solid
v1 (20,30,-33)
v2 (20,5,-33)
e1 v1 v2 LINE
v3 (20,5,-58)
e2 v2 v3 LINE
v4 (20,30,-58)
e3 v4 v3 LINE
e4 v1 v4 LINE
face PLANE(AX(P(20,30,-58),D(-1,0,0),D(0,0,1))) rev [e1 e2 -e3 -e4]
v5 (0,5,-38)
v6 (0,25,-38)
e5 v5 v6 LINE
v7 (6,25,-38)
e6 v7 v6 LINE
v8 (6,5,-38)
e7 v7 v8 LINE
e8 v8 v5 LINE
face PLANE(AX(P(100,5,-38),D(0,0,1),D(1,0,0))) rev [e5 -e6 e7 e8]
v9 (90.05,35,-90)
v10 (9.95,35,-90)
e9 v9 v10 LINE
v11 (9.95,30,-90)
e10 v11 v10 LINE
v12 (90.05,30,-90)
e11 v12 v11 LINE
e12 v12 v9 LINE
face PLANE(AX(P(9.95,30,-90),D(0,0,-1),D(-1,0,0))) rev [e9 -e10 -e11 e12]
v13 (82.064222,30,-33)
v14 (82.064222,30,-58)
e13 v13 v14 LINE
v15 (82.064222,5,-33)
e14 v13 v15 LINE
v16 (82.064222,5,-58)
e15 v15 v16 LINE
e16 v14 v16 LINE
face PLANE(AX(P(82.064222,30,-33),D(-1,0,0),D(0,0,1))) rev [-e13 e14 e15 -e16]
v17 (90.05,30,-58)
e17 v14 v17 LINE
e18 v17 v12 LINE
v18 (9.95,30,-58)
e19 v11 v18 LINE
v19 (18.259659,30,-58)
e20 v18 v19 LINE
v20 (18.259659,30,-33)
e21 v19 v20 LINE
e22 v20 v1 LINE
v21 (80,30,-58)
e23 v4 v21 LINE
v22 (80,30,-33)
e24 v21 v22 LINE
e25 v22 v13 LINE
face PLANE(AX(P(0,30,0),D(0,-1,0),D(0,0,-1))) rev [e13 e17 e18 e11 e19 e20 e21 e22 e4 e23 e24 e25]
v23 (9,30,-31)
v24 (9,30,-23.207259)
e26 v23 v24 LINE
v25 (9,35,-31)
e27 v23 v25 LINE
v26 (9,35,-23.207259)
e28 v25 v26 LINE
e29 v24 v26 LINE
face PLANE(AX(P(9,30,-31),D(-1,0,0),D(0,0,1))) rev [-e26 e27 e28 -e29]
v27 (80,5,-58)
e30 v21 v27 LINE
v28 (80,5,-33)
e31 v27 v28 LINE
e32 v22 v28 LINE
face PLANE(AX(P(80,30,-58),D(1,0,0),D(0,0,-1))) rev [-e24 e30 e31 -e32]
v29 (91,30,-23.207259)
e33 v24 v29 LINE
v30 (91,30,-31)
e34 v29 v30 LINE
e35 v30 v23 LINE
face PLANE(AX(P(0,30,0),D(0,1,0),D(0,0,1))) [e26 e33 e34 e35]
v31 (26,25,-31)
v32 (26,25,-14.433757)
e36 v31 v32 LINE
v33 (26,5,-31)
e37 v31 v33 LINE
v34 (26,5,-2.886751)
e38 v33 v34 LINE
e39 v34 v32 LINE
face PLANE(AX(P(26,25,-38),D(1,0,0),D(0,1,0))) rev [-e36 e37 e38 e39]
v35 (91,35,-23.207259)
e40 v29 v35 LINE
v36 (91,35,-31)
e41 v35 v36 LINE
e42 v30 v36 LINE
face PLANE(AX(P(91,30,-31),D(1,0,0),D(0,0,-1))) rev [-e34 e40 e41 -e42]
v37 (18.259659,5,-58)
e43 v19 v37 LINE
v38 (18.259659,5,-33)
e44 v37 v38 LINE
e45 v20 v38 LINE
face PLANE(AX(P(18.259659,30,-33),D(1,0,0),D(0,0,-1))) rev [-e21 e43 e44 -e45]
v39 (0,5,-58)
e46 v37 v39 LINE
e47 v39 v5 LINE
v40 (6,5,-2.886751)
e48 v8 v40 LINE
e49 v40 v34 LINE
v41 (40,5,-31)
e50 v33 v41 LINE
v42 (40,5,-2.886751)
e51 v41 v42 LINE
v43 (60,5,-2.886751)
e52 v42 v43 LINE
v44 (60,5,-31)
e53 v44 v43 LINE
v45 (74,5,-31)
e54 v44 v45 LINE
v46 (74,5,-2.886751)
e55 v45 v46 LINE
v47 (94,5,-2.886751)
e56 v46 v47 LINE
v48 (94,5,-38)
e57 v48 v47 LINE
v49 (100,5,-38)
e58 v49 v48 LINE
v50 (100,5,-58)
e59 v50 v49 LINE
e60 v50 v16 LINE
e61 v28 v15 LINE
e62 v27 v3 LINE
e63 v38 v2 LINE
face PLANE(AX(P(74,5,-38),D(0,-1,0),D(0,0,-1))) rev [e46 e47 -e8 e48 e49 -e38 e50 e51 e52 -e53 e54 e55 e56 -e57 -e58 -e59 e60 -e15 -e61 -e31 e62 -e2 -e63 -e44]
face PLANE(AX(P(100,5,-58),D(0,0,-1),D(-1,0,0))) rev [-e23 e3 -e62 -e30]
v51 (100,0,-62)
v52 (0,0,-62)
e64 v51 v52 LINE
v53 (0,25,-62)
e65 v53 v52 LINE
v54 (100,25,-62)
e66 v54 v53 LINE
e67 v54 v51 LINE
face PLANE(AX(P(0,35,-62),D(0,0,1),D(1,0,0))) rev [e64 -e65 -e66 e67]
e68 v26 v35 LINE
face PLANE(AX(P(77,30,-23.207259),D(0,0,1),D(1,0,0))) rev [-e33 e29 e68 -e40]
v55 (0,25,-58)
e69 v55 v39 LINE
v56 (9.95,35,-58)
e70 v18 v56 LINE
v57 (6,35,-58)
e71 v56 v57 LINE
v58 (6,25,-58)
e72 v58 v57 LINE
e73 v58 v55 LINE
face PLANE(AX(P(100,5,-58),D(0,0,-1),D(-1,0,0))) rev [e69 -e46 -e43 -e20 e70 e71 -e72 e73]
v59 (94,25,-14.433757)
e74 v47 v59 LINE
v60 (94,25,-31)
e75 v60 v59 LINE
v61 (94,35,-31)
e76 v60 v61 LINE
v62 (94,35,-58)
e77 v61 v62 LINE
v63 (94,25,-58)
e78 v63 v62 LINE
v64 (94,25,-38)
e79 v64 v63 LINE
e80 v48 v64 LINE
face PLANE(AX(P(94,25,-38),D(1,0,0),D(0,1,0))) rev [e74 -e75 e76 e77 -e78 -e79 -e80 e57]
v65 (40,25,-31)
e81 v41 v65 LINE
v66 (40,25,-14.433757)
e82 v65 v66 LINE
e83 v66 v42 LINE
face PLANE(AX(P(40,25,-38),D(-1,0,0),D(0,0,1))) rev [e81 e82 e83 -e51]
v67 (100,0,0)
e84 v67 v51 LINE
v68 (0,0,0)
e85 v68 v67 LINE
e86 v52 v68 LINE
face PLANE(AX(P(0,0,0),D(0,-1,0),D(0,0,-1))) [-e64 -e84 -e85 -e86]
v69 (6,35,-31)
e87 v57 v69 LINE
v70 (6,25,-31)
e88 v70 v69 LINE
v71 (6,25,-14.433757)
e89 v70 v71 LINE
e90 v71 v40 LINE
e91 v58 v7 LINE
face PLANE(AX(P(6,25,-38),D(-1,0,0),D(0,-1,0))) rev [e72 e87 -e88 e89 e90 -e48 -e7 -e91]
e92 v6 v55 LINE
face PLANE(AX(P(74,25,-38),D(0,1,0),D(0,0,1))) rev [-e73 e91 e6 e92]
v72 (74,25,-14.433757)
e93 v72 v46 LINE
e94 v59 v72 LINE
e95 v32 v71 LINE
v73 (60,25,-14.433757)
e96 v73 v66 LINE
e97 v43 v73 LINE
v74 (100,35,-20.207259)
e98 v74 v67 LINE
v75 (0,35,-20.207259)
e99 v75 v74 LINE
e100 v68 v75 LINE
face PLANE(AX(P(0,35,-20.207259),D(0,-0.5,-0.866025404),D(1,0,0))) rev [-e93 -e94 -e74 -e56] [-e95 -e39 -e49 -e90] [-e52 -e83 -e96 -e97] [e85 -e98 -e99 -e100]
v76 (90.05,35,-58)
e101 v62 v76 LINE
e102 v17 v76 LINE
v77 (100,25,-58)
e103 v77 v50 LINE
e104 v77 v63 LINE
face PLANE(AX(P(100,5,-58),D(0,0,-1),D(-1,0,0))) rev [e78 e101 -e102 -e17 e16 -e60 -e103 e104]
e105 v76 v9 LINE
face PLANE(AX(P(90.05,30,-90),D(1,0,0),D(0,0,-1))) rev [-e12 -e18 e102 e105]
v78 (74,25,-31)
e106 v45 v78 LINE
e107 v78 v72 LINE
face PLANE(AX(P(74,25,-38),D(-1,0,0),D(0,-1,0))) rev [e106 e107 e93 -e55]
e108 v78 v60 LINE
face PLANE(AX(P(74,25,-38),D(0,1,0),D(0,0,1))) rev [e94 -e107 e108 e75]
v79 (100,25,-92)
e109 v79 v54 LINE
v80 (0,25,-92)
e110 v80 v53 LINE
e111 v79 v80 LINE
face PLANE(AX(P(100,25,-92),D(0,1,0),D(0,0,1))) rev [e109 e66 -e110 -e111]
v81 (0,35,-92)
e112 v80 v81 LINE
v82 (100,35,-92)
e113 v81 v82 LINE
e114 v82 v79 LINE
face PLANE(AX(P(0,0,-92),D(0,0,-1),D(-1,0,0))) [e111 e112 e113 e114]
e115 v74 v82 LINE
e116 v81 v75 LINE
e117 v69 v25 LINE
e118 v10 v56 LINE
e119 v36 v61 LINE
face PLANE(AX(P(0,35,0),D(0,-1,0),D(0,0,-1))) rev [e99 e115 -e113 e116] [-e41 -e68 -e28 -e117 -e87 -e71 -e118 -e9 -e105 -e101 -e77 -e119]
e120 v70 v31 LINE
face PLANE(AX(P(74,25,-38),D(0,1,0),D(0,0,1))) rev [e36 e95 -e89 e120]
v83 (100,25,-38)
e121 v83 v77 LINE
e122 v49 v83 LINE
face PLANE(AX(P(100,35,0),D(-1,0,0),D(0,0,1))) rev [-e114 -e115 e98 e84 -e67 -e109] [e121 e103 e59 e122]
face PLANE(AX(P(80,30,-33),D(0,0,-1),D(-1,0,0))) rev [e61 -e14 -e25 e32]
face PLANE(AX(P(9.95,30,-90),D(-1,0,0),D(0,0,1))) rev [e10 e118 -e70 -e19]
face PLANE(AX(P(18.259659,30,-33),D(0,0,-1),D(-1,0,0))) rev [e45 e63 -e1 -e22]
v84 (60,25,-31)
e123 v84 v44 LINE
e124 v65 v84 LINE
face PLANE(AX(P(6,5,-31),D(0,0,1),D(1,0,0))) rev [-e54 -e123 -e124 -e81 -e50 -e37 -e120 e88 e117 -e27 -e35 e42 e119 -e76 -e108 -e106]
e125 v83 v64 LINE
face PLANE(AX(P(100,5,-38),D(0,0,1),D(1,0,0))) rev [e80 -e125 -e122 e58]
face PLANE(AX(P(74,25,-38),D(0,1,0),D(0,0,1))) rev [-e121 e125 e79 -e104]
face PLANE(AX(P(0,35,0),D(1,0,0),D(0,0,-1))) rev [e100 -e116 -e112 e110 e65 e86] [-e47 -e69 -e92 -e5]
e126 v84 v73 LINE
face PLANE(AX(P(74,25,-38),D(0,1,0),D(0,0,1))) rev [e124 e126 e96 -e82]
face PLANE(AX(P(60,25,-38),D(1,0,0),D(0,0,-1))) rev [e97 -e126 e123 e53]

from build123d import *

# Parameters (mm, degrees)
CROQUIS1_W              = 100
CROQUIS1_H              = 62
SALIENTE_EXTRUIR1_DEPTH = 35
CHAFL_N1_SIZE2          = 20.207259422
CHAFL_N1_SIZE           = 35
CROQUIS3_W              = 20
CROQUIS3_H              = 20
CORTAR_EXTRUIR1_DEPTH   = 38
CROQUIS4_W              = 20
CROQUIS4_H              = 20
CORTAR_EXTRUIR2_DEPTH   = 100
CROQUIS7_W              = 88
CROQUIS7_H              = 27
CORTAR_EXTRUIR5_DEPTH   = 30
CORTAR_EXTRUIR6_DEPTH   = 5
CROQUIS9_W              = 1.740341303
CROQUIS9_H              = 25
CROQUIS9_W_2            = 2.064222337
SALIENTE_EXTRUIR2_DEPTH = 25
CROQUIS10_W             = 100
CROQUIS10_H             = 10
SALIENTE_EXTRUIR3_DEPTH = 30
CROQUIS11_W             = 80.1
CROQUIS11_H             = 32
CORTAR_EXTRUIR7_DEPTH   = 5


with BuildPart() as part:
    # Croquis1 → Saliente-Extruir1 (new body)
    with BuildSketch(Plane(origin=(0, 0, 0), x_dir=(1, 0, 0), z_dir=(0, 1, 0))):
        with Locations((50, 31)):
            Rectangle(CROQUIS1_W, CROQUIS1_H)
    extrude(amount=SALIENTE_EXTRUIR1_DEPTH)

    # Chaflán1
    chafl_n1_edges = [part.edges().sort_by_distance(p)[0] for p in [
        (50, 35, 0),
    ]]
    chafl_n1_side = [part.faces().sort_by_distance(p)[0] for p in [
        (50, 34.595854812, 0),
    ]]
    chamfer(chafl_n1_edges, length=CHAFL_N1_SIZE - 0.0001, length2=CHAFL_N1_SIZE2 - 0.0001, reference=chafl_n1_side[0])  # a hair under: the kernel refuses the full size

    # Croquis3 → Cortar-Extruir1 (cut)
    with BuildSketch(Plane.XY):
        with Locations((50, 15)):
            Rectangle(CROQUIS3_W, CROQUIS3_H)
        with Locations((16, 15)):
            Rectangle(CROQUIS3_W, CROQUIS3_H)
        with Locations((84, 15)):
            Rectangle(CROQUIS3_W, CROQUIS3_H)
    extrude(amount=-CORTAR_EXTRUIR1_DEPTH, mode=Mode.SUBTRACT)

    # Croquis4 → Cortar-Extruir2 (cut)
    with BuildSketch(Plane.ZY):
        with Locations((-48, 15)):
            Rectangle(CROQUIS4_W, CROQUIS4_H)
    extrude(amount=-CORTAR_EXTRUIR2_DEPTH, mode=Mode.SUBTRACT)

    # Croquis7 → Cortar-Extruir5 (cut)
    with BuildSketch(Plane(origin=(0, 35, 0), x_dir=(1, 0, 0), z_dir=(0, 1, 0))):
        with Locations((50, 44.5)):
            Rectangle(CROQUIS7_W, CROQUIS7_H)
    extrude(amount=-CORTAR_EXTRUIR5_DEPTH, mode=Mode.SUBTRACT)

    # Croquis8 → Cortar-Extruir6 (cut)
    with BuildSketch(Plane(origin=(0, 35, 0), x_dir=(1, 0, 0), z_dir=(0, 1, 0))):
        Polygon((9, 31), (23, 31), (43, 31), (57, 31), (77, 31), (91, 31), (91, 23.207259422), (77, 23.207259422), (57, 23.207259422), (43, 23.207259422), (23, 23.207259422), (9, 23.207259422), align=None)
    extrude(amount=-CORTAR_EXTRUIR6_DEPTH, mode=Mode.SUBTRACT)

    # Croquis9 → Saliente-Extruir2 (add)
    with BuildSketch(Plane(origin=(0, 5, 0), x_dir=(1, 0, 0), z_dir=(0, 1, 0))):
        with Locations((19.129829349, 45.5)):
            Rectangle(CROQUIS9_W, CROQUIS9_H)
        with Locations((81.032111168, 45.5)):
            Rectangle(CROQUIS9_W_2, CROQUIS9_H)
    extrude(amount=SALIENTE_EXTRUIR2_DEPTH)

    # Croquis10 → Saliente-Extruir3 (add)
    with BuildSketch(Plane(origin=(0, 0, -62), x_dir=(-1, 0, 0), z_dir=(0, 0, -1))):
        with Locations((-50, 30)):
            Rectangle(CROQUIS10_W, CROQUIS10_H)
    extrude(amount=SALIENTE_EXTRUIR3_DEPTH)

    # Croquis11 → Cortar-Extruir7 (cut)
    with BuildSketch(Plane(origin=(0, 35, 0), x_dir=(1, 0, 0), z_dir=(0, 1, 0))):
        with Locations((50, 74)):
            Rectangle(CROQUIS11_W, CROQUIS11_H)
    extrude(amount=-CORTAR_EXTRUIR7_DEPTH, mode=Mode.SUBTRACT)


solid = part.part
